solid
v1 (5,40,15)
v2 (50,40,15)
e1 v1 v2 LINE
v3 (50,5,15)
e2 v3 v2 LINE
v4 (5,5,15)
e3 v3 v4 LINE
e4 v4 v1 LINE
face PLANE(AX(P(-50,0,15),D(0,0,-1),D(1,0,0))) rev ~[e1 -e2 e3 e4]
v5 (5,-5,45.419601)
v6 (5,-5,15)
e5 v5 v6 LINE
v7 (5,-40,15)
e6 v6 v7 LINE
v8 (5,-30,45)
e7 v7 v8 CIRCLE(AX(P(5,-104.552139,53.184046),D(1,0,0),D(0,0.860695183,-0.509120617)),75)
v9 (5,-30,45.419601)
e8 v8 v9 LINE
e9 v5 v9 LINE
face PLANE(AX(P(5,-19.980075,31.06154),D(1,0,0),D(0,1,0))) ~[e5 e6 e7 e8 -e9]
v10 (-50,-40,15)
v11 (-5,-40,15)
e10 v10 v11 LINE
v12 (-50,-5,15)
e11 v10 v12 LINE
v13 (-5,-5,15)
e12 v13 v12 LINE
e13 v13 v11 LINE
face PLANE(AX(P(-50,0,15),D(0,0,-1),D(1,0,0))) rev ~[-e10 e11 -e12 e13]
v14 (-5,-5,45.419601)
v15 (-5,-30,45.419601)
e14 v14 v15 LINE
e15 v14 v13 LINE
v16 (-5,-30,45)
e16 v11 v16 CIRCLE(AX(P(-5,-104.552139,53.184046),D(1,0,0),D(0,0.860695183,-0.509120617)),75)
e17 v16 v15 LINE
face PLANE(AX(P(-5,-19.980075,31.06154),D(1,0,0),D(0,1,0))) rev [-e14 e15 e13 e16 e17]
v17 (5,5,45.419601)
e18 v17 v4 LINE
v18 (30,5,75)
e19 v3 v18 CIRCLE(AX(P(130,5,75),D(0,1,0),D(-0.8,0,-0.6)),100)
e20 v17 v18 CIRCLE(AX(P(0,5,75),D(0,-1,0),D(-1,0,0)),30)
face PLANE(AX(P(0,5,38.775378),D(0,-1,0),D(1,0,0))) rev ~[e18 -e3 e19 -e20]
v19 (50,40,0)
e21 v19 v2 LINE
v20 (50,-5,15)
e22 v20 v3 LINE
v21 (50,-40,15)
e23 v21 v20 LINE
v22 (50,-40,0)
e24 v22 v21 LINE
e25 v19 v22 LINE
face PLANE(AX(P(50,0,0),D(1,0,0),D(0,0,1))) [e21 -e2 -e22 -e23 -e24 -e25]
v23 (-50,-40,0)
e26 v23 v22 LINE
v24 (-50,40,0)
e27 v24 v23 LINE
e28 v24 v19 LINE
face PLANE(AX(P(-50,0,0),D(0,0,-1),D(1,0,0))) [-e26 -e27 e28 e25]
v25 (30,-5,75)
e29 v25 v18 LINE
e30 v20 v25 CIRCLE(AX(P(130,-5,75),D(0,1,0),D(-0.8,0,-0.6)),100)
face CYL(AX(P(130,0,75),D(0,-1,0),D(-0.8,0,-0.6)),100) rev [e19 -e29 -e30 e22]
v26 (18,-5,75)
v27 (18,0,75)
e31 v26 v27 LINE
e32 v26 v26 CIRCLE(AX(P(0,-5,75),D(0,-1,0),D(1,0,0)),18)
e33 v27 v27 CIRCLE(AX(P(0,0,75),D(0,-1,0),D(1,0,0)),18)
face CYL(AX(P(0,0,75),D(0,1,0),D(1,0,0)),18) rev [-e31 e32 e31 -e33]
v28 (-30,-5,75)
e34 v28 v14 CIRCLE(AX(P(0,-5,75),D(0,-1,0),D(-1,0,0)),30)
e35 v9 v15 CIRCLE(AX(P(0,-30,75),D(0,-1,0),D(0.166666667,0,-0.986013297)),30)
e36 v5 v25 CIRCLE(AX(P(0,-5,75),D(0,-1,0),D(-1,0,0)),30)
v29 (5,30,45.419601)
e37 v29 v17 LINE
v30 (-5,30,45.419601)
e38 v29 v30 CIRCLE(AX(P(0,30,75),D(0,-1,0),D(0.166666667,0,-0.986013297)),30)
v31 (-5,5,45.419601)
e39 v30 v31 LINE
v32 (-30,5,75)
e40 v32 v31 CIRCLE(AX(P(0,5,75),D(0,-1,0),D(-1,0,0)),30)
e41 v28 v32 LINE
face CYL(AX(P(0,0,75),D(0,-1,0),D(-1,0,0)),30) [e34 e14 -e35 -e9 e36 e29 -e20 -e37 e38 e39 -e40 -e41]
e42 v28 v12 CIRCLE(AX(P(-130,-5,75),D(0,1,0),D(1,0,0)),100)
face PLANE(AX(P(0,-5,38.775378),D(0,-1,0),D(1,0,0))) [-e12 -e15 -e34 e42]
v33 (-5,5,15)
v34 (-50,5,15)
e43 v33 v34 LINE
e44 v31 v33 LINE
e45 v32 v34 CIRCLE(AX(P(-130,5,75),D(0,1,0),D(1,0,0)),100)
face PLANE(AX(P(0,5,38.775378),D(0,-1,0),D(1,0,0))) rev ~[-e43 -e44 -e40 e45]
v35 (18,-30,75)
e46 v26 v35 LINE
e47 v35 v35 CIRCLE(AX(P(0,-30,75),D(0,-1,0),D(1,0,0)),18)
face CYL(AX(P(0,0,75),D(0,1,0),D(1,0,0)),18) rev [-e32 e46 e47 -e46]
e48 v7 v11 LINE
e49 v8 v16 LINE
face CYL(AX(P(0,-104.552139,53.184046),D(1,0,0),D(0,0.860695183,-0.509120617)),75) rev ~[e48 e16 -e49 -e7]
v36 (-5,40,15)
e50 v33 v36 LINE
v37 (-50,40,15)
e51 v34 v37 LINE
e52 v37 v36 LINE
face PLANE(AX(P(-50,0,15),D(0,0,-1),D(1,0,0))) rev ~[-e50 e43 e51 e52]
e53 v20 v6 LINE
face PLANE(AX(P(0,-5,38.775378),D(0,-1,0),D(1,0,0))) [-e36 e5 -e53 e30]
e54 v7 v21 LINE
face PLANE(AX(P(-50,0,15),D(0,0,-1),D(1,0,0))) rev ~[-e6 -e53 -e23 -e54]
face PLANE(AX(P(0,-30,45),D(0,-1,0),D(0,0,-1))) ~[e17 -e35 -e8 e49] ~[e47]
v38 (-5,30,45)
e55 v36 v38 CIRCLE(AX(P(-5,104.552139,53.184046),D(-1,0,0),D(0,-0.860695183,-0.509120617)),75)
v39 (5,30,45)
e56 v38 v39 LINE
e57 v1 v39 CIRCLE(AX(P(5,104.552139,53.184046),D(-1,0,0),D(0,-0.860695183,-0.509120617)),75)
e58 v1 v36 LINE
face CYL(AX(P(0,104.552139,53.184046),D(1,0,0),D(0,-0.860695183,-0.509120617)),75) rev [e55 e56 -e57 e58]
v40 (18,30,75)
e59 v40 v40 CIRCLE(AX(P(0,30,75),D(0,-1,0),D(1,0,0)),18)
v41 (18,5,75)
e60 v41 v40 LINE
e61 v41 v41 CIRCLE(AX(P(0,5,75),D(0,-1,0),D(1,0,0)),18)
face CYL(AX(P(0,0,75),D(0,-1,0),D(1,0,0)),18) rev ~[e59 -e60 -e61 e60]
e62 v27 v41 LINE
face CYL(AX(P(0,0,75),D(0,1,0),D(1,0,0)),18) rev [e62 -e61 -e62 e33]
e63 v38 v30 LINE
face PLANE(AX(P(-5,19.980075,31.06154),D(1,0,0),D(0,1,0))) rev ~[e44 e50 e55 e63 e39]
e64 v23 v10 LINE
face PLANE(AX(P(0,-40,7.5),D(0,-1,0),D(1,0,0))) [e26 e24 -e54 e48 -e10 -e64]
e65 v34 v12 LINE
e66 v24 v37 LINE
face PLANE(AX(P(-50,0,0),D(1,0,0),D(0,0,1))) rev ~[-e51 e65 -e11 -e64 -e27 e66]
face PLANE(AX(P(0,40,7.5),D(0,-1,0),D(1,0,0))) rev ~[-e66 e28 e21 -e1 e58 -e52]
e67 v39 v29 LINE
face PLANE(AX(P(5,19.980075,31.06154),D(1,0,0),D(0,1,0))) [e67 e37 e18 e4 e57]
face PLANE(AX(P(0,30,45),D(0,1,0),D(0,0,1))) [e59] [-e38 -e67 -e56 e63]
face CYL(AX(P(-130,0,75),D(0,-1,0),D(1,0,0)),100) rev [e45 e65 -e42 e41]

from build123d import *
from build123d import SkipClean  # not in build123d's __all__

# Parameters (mm, degrees)
F0_W     = 100
F0_H     = 15
F1_DEPTH = 40
F0_R     = 18
F2_DEPTH = 5
F3_DEPTH = 30
F5_DEPTH = 5


# Not quite as in the source:
# - a pattern or mirror of a feature is missing from the dataset's text; its kind, count and spacing are read off the source's solid


with BuildPart() as f1:
    # F0 (on Front) → F1 (new body, symmetric)
    with BuildSketch(Plane.XZ):
        with Locations((0, 7.5)):
            Rectangle(F0_W, F0_H)
    extrude(amount=F1_DEPTH, both=True)

    # F0 (on Front) → F2 (join, symmetric)
    with BuildSketch(Plane.XZ):
        with BuildLine():
            ThreePointArc((-30, 75), (-35.1316701949, 43.3772233983), (-50, 15))
            Line((-50, 15), (50, 15))
            ThreePointArc((50, 15), (35.1316701949, 43.3772233983), (30, 75))
            ThreePointArc((30, 75), (0, 45), (-30, 75))
        make_face()
        with Locations((0, 7.5)):
            Rectangle(F0_W, F0_H)
        with BuildLine():
            ThreePointArc((30, 75), (0, 105), (-30, 75))
            ThreePointArc((-30, 75), (0, 45), (30, 75))
        make_face()
        with Locations((0, 75)):
            Circle(F0_R, mode=Mode.SUBTRACT)
    extrude(amount=F2_DEPTH, both=True)

    # F0 (on Front) → F3 (join, symmetric)
    with BuildSketch(Plane.XZ):
        with BuildLine():
            ThreePointArc((30, 75), (0, 105), (-30, 75))
            ThreePointArc((-30, 75), (0, 45), (30, 75))
        make_face()
        with Locations((0, 75)):
            Circle(F0_R, mode=Mode.SUBTRACT)
    with SkipClean():  # cleaning this boolean's faces spoils the solid; the shape is the same uncleaned
        extrude(amount=F3_DEPTH, both=True)

    # F4 (on Right) → F5 (join, symmetric)
    with BuildSketch(Plane.YZ):
        with BuildLine():
            ThreePointArc((40, 15), (33.4008913624, 29.4669637875), (30, 45))
            Line((30, 45), (30, 50))
            Line((30, 50), (5, 50))
            Line((5, 50), (5, 15))
            Line((5, 15), (40, 15))
        make_face()
    f5 = extrude(amount=F5_DEPTH, both=True)

    # F5_copies: F5 across plane
    add(f5.mirror(Plane(origin=(0, 0, 0), x_dir=(0, 0, -1), z_dir=(0, -1, 0))), clean=False)


solid = f1.part
